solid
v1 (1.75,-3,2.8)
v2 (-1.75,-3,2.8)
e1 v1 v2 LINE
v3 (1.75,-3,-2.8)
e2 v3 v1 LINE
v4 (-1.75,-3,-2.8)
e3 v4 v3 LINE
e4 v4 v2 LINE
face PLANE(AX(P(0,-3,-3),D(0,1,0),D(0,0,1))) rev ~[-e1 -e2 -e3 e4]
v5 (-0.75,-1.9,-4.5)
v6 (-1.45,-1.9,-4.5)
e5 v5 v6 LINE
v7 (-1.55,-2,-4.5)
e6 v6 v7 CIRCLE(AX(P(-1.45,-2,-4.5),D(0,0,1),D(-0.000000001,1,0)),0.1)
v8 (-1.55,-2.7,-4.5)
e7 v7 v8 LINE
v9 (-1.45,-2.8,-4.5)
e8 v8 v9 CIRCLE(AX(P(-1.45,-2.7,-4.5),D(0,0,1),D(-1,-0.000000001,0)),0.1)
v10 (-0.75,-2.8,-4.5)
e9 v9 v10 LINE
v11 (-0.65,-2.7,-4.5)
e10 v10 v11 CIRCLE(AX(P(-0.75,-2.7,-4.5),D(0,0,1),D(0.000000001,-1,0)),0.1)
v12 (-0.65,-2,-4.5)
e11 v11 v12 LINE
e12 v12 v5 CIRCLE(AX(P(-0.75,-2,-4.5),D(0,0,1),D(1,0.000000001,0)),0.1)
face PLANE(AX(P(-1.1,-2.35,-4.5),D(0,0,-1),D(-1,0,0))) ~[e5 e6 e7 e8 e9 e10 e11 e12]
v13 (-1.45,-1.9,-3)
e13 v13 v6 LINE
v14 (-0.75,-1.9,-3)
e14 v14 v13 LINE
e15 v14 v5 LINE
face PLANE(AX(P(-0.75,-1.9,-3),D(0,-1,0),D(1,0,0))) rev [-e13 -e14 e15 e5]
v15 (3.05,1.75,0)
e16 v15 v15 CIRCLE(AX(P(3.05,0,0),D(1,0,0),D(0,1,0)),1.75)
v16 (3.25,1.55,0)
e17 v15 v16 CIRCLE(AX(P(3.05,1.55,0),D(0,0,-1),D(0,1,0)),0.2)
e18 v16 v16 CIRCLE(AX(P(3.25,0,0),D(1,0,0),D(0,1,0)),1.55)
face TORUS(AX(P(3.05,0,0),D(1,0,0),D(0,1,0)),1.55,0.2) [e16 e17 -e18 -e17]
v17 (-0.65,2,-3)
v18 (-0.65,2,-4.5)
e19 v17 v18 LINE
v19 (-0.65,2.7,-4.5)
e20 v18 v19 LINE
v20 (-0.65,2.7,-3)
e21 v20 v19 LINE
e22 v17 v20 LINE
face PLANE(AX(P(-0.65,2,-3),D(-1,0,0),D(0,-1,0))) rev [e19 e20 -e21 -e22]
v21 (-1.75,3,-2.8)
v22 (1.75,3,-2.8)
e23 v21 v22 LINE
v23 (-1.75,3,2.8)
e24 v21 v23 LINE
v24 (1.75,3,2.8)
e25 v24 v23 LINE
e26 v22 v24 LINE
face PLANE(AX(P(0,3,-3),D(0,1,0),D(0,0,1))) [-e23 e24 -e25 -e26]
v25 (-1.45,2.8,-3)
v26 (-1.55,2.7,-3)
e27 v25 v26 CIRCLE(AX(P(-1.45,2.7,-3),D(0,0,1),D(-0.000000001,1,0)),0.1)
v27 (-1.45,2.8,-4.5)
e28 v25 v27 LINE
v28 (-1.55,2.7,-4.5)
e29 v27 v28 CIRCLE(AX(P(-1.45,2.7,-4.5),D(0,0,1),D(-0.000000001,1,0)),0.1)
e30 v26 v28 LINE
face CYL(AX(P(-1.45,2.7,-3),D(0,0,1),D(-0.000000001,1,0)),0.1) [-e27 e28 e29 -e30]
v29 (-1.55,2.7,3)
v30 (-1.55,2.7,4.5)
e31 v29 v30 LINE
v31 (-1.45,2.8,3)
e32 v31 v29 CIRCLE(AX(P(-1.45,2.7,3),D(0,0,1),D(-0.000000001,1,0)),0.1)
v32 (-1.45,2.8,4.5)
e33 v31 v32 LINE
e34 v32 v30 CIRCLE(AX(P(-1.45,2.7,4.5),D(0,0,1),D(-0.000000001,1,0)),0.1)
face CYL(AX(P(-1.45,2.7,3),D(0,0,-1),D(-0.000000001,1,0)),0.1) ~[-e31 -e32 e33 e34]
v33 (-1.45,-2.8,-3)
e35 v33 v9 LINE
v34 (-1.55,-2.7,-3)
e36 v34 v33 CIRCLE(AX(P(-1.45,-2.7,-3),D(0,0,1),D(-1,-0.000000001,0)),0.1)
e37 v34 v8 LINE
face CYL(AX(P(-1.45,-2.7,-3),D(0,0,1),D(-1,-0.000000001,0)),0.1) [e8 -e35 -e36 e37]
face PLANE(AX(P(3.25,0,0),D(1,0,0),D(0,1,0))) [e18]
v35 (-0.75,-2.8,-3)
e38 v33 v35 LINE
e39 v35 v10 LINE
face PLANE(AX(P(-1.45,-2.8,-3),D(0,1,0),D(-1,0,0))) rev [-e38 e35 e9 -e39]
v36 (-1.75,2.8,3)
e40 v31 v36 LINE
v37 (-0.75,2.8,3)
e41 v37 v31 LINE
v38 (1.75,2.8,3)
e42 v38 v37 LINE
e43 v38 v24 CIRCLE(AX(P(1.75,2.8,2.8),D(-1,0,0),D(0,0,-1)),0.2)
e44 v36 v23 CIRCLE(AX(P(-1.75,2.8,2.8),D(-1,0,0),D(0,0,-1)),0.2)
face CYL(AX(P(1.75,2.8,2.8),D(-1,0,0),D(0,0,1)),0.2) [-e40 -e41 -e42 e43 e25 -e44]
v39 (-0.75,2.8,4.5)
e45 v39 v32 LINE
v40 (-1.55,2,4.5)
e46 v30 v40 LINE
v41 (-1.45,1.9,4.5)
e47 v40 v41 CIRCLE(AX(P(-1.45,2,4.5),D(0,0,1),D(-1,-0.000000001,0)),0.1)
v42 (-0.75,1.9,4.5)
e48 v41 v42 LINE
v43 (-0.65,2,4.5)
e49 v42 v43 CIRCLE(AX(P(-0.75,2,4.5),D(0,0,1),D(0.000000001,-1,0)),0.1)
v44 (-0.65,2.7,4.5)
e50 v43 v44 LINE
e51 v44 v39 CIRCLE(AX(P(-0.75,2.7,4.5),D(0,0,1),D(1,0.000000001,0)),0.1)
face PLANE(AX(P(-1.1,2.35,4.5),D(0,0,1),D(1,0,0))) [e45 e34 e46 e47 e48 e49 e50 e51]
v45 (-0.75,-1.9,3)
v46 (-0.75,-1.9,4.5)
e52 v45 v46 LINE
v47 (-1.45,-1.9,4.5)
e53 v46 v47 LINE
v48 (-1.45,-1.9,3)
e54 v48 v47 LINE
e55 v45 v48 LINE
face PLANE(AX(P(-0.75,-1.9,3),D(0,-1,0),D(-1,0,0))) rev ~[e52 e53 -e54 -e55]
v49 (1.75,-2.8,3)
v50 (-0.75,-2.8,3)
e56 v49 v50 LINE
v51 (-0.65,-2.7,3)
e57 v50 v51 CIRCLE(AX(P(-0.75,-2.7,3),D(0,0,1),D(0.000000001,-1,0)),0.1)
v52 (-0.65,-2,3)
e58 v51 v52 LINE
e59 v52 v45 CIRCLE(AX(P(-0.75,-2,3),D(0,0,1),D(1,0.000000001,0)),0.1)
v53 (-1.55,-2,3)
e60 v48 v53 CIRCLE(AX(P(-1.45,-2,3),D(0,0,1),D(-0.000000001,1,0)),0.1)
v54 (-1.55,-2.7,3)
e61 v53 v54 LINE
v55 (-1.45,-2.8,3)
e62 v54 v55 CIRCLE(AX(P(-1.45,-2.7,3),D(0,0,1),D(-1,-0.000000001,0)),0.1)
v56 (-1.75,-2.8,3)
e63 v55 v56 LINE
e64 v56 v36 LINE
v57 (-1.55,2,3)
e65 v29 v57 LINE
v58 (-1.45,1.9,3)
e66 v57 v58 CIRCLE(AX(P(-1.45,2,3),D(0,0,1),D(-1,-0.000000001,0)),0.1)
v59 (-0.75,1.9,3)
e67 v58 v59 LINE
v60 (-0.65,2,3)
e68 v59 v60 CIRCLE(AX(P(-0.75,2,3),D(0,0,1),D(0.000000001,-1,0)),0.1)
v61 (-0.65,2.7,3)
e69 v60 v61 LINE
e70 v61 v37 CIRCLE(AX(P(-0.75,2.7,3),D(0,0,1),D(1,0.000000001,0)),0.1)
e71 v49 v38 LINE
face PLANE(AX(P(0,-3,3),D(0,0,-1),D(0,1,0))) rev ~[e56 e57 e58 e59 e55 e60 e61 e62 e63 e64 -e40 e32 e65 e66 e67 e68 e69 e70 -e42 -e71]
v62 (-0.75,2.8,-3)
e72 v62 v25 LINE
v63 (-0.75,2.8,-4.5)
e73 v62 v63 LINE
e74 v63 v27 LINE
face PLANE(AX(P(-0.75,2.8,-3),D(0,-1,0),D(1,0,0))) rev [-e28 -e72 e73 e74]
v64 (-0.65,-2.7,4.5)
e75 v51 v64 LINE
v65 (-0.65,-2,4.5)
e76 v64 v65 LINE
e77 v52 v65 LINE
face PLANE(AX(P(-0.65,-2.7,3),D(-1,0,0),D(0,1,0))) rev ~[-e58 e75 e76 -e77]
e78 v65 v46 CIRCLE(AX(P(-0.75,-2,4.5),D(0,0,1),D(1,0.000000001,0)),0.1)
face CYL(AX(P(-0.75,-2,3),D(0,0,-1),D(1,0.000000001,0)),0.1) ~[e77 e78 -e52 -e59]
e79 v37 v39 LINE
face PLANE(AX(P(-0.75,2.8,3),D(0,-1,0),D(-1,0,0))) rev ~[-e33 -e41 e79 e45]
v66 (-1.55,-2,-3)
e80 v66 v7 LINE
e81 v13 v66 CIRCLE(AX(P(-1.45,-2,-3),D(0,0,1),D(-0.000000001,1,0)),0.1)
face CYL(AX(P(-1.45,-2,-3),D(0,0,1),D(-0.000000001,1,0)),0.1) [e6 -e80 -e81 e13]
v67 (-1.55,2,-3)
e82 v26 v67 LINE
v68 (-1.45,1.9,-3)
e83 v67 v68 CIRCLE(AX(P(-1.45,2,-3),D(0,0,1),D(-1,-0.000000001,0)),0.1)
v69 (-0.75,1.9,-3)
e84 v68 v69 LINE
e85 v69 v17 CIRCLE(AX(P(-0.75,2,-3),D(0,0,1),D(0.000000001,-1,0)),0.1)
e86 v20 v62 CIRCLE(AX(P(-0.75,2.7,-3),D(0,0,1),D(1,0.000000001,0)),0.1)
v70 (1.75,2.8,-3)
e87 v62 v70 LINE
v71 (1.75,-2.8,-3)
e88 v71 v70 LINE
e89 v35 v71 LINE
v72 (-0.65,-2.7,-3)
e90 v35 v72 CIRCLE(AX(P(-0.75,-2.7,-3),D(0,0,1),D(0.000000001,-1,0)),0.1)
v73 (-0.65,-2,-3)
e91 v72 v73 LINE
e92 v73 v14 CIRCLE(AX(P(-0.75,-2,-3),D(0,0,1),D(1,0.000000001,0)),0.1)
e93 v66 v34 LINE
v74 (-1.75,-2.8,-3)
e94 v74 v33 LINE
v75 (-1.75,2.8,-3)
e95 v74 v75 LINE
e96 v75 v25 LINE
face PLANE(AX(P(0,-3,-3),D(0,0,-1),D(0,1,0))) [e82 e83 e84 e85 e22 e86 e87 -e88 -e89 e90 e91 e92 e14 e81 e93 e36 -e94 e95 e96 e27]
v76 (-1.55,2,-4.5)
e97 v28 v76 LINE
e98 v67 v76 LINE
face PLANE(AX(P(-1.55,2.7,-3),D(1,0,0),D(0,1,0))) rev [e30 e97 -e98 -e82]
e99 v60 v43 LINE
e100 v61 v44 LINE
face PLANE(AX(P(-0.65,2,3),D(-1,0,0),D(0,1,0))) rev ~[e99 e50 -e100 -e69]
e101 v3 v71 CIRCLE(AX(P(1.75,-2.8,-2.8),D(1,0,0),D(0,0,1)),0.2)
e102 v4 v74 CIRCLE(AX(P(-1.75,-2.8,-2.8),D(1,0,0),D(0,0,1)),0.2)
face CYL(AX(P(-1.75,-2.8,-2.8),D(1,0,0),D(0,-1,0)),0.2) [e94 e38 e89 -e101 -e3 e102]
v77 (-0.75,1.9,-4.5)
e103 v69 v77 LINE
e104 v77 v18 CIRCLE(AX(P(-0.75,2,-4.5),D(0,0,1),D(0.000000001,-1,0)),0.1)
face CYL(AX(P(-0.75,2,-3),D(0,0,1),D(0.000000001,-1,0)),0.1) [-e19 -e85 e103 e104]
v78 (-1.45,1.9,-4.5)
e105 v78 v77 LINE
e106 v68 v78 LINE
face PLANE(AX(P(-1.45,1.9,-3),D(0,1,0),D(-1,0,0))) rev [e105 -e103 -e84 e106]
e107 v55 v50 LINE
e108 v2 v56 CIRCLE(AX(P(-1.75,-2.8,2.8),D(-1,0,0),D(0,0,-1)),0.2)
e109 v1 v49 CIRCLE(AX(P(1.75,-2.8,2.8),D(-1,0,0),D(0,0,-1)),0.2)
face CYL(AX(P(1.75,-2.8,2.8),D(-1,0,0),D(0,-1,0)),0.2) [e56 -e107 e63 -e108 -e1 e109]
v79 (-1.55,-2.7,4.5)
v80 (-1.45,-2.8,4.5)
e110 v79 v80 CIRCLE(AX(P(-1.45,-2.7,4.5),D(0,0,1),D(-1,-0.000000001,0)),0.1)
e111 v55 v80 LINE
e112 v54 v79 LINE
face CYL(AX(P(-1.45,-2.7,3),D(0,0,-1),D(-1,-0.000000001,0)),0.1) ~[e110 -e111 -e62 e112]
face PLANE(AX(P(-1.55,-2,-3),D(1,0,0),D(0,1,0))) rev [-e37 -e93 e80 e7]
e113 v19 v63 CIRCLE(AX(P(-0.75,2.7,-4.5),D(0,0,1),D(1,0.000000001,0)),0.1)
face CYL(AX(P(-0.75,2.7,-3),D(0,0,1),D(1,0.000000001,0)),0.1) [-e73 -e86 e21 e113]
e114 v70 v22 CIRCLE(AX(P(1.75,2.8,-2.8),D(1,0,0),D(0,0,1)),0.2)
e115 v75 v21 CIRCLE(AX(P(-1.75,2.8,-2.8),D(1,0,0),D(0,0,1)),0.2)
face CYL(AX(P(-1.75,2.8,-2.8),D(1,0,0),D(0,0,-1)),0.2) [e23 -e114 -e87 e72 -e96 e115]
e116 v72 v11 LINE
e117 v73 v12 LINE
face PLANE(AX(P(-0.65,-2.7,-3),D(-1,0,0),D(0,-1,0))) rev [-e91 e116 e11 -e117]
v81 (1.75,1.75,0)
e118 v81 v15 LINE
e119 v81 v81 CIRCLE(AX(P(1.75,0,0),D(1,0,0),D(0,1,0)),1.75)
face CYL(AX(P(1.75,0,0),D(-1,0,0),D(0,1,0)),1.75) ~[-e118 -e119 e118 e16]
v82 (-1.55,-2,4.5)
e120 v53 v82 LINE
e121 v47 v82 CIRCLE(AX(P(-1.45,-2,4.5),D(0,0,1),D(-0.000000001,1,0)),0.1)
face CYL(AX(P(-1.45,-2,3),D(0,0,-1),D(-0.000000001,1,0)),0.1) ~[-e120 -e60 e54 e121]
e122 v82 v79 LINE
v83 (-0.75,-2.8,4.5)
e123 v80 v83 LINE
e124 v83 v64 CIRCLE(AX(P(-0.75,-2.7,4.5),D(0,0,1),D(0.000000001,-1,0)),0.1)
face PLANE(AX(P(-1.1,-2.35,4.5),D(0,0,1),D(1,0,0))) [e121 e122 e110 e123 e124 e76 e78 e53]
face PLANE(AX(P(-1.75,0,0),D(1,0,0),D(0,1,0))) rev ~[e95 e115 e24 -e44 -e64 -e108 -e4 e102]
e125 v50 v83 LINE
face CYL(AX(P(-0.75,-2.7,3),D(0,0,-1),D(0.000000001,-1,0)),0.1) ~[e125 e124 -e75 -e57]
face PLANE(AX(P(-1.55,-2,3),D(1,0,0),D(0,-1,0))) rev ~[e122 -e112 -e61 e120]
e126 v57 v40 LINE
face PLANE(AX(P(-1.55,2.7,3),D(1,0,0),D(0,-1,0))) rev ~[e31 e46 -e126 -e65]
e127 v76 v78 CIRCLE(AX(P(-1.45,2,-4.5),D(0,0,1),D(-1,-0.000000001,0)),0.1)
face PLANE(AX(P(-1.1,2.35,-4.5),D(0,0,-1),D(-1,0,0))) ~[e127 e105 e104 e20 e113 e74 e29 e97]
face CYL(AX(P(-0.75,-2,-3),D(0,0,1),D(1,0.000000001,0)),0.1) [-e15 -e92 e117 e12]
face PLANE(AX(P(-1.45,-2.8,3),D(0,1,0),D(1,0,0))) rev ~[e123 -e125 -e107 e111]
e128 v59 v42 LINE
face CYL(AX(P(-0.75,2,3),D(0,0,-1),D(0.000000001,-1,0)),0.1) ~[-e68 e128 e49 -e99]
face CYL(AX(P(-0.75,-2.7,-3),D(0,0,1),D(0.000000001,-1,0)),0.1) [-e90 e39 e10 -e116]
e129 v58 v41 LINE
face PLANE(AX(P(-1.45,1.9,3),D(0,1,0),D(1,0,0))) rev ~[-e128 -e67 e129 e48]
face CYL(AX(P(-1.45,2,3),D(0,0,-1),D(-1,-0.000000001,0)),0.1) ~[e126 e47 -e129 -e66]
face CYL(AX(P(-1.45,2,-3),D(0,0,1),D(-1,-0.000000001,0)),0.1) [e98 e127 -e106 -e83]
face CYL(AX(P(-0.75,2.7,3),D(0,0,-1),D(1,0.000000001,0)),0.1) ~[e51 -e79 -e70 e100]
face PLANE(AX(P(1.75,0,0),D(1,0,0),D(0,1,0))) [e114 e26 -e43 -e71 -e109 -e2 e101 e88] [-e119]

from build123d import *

# Parameters (mm, degrees)
F0_W     = 6
F0_H     = 6
F1_DEPTH = 1.75
F2_R     = 1.75
F3_DEPTH = 1.5
F4_R     = 0.2
F6_DEPTH = 1.5


# Not quite as in the source:
# - a pattern or mirror of a feature is missing from the dataset's text; its kind, count and spacing are read off the source's solid


with BuildPart() as f1:
    # F0 (on Right) → F1 (new body, symmetric)
    with BuildSketch(Plane.YZ):
        Rectangle(F0_W, F0_H)
    extrude(amount=F1_DEPTH, both=True)

    # F2 (on face) → F3 (join)
    with BuildSketch(Plane.YZ.offset(1.75)):
        Circle(F2_R)
    extrude(amount=F3_DEPTH)

    # F4
    f4_edges = [f1.edges().sort_by_distance(p)[0] for p in [
        (3.25, -1.75, 0),
        (0, -3, 3),
        (0, 3, 3),
        (0, 3, -3),
        (0, -3, -3),
    ]]
    fillet(f4_edges, radius=F4_R)

    # F5 (on face) → F6 (join)
    with BuildSketch(Plane.XY.offset(3)):
        with BuildLine():
            ThreePointArc((-1.55, -2.7), (-1.5207106781, -2.7707106781), (-1.45, -2.8))
            Line((-1.45, -2.8), (-0.75, -2.8))
            ThreePointArc((-0.75, -2.8), (-0.6792893219, -2.7707106781), (-0.65, -2.7))
            Line((-0.65, -2.7), (-0.65, -2))
            ThreePointArc((-0.65, -2), (-0.6792893219, -1.9292893219), (-0.75, -1.9))
            Line((-0.75, -1.9), (-1.45, -1.9))
            ThreePointArc((-1.45, -1.9), (-1.5207106781, -1.9292893219), (-1.55, -2))
            Line((-1.55, -2), (-1.55, -2.7))
        make_face()
        with BuildLine():
            ThreePointArc((-0.65, 2.7), (-0.6792893219, 2.7707106781), (-0.75, 2.8))
            Line((-0.75, 2.8), (-1.45, 2.8))
            ThreePointArc((-1.45, 2.8), (-1.5207106781, 2.7707106781), (-1.55, 2.7))
            Line((-1.55, 2.7), (-1.55, 2))
            ThreePointArc((-1.55, 2), (-1.5207106781, 1.9292893219), (-1.45, 1.9))
            Line((-1.45, 1.9), (-0.75, 1.9))
            ThreePointArc((-0.75, 1.9), (-0.6792893219, 1.9292893219), (-0.65, 2))
            Line((-0.65, 2), (-0.65, 2.7))
        make_face()
    f6 = extrude(amount=F6_DEPTH)

    # F6_copies: F6 across plane
    add(f6.mirror(Plane(origin=(0, 0, 0), x_dir=(-1, 0, 0), z_dir=(0, 0, -1))))


solid = f1.part
